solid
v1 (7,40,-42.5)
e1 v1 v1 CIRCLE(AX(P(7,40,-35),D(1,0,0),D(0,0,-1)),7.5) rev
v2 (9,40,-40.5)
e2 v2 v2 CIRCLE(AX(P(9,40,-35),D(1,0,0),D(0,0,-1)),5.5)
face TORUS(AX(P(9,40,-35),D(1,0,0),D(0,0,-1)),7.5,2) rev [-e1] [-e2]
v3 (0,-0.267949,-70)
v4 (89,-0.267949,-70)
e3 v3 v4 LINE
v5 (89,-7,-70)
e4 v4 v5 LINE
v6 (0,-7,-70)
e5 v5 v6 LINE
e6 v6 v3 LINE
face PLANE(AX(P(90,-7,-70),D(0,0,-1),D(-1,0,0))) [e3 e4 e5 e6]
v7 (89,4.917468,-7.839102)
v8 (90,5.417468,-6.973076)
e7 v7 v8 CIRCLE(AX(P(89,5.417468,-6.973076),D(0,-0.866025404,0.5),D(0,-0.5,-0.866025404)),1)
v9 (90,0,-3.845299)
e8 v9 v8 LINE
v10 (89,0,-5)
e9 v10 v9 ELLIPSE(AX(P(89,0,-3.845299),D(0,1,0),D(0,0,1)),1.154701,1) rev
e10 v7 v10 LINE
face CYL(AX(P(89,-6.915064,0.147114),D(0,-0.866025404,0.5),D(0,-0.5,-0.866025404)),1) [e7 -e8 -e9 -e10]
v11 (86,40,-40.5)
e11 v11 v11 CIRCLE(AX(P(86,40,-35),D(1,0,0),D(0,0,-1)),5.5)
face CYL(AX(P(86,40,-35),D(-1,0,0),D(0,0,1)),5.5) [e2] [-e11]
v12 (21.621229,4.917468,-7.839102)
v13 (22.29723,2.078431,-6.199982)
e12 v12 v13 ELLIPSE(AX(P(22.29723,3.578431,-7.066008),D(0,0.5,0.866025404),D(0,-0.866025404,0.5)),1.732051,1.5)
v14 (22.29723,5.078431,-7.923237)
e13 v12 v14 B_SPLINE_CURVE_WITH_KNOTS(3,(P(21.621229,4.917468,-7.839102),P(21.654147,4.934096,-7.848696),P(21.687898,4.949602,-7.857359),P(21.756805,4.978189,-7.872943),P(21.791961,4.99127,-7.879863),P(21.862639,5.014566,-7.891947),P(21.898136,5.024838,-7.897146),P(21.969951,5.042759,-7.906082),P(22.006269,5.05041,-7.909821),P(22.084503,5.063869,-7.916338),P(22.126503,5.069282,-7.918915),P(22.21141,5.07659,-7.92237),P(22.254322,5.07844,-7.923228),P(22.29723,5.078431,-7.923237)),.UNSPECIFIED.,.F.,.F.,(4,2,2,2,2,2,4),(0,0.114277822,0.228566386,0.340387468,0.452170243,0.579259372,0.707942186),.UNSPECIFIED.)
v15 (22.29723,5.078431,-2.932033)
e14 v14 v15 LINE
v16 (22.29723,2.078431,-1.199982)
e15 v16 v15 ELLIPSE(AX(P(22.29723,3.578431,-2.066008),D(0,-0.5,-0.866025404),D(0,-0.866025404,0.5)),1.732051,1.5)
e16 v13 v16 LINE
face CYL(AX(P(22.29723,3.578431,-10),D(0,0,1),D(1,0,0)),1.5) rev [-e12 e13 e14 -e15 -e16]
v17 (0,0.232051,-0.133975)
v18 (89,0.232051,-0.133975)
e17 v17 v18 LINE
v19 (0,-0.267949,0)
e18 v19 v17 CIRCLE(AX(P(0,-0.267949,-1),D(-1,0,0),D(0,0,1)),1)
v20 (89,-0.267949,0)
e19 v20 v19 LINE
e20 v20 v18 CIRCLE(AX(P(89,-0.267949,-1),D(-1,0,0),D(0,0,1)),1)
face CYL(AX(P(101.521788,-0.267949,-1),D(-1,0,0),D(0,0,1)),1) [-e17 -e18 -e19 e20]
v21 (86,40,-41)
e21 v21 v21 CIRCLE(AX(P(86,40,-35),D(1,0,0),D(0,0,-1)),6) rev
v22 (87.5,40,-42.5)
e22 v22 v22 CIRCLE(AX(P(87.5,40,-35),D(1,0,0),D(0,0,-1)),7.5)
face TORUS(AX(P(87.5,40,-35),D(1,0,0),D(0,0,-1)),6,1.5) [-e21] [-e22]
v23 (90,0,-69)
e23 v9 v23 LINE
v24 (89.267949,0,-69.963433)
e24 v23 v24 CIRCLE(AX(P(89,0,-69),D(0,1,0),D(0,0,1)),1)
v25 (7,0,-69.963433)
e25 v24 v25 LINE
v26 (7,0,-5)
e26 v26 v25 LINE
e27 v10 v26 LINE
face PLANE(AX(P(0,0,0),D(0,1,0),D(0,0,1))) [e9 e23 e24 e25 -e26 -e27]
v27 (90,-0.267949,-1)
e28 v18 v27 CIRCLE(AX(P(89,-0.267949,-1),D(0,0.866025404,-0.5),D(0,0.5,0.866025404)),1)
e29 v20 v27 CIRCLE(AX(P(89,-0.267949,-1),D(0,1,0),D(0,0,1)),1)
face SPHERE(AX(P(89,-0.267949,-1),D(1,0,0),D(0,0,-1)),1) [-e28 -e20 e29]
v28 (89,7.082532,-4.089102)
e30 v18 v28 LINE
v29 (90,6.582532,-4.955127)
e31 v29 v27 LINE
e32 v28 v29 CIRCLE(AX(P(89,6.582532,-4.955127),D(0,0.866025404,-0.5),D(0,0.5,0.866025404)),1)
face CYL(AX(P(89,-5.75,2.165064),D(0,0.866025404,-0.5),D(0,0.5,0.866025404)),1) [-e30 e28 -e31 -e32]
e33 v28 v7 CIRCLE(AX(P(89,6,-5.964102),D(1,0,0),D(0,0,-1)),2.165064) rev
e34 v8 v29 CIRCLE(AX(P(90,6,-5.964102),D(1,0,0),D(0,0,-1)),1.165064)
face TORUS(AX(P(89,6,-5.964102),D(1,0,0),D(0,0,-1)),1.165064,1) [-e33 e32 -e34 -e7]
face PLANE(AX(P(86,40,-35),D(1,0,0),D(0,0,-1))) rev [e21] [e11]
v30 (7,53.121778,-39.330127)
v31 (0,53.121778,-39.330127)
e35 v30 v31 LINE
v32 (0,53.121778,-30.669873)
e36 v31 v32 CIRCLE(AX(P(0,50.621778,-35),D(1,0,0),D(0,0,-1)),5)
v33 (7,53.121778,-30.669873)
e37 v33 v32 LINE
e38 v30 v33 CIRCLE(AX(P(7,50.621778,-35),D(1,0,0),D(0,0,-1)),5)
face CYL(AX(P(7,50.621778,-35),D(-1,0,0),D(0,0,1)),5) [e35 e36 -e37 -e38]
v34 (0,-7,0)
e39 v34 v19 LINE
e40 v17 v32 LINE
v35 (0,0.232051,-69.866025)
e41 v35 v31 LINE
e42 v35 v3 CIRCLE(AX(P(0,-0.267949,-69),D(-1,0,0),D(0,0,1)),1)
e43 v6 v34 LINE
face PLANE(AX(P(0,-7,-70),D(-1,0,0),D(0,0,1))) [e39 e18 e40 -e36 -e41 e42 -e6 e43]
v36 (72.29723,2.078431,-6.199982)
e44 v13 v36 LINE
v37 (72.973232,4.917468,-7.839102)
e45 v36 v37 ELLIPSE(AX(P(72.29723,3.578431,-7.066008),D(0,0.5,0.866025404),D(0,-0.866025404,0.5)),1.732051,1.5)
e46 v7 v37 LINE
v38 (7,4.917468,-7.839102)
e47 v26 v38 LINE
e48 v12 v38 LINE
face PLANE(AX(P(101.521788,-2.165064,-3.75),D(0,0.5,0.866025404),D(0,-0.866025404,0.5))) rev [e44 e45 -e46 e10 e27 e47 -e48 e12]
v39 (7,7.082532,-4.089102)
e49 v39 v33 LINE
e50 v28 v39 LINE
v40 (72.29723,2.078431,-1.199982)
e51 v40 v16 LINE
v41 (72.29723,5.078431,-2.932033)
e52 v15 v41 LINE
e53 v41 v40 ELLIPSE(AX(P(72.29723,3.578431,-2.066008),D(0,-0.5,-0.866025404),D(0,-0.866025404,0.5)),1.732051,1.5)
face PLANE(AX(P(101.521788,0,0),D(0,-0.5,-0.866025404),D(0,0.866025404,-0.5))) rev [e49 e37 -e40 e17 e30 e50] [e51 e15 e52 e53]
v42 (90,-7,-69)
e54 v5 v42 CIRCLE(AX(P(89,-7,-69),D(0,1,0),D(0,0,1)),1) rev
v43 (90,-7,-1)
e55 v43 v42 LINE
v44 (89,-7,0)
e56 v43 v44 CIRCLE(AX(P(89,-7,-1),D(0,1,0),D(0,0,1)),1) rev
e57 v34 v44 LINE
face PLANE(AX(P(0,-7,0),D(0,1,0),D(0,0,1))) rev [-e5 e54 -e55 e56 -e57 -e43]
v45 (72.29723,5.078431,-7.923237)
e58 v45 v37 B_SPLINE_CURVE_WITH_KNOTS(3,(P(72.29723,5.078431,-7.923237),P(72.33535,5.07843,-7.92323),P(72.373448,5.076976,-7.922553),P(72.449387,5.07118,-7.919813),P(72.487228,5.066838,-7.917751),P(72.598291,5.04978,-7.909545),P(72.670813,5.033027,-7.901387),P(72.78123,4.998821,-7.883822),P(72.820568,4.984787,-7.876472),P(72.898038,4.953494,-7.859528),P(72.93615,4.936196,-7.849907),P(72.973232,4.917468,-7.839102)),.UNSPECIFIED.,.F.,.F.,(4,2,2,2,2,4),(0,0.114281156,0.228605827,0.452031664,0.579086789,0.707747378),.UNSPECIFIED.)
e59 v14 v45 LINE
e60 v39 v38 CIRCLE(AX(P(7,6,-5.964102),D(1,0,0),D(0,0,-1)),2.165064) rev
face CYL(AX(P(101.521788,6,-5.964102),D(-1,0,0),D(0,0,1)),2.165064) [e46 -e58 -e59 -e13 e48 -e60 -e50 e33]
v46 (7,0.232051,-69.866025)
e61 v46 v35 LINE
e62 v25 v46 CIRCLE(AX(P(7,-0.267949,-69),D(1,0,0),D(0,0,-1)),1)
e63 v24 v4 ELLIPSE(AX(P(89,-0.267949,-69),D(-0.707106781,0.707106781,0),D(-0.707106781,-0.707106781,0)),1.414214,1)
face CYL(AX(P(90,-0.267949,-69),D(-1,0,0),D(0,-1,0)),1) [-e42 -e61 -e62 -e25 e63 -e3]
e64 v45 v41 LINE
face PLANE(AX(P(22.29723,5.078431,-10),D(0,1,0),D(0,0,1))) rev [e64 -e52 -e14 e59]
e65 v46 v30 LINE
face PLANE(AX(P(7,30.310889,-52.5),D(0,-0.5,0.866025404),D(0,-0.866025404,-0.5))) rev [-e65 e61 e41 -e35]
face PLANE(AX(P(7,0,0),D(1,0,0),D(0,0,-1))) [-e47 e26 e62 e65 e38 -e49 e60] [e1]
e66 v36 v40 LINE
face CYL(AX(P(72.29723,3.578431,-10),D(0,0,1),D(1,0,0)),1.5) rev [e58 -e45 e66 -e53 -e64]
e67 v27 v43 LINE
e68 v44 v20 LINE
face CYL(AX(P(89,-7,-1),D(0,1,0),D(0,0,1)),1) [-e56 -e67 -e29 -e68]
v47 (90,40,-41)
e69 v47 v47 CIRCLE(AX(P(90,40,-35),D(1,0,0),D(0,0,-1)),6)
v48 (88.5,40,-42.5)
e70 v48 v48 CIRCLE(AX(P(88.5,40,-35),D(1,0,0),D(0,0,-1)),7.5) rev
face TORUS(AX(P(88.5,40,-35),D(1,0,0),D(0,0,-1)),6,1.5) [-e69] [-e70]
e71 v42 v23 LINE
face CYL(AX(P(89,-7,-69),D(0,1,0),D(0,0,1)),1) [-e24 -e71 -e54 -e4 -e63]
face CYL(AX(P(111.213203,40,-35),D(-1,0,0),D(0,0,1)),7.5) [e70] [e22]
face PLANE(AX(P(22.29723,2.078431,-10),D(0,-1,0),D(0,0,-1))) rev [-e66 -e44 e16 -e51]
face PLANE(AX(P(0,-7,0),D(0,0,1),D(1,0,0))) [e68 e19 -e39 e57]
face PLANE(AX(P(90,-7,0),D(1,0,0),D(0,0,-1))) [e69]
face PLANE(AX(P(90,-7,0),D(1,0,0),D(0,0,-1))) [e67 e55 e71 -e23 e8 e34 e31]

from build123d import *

# Parameters (mm, degrees)
SKETCH_2_W          = 90
SKETCH_2_H          = 70
EXTRUDE_1_DEPTH     = 7
EXTRUDE_4_DEPTH     = 7
SKETCH_9_R          = 5.5
EXTRUDE_5_DEPTH     = 79
EXTRUDE_START       = 79
SKETCH_10_R         = 7.5
EXTRUDE_6_DEPTH     = 4
EXTRUDE_7_DEPTH     = 83
CUT_EXTRUDE_1_DEPTH = 10
FILLET_START        = -1
FILLET_1_DEPTH      = 92
FILLET_2_R          = 1
FILLET_3_R          = 1.5
FILLET_4_R          = 1.5
FILLET_9_R          = 1
FILLET_10_R         = 1
FILLET_12_R         = 2


with BuildPart() as part:
    # 草图2 → 凸台-拉伸1 (new body)
    with BuildSketch(Plane(origin=(0, 0, 0), x_dir=(1, 0, 0), z_dir=(0, 1, 0))):
        with Locations((45, 35)):
            Rectangle(SKETCH_2_W, SKETCH_2_H)
    extrude(amount=-EXTRUDE_1_DEPTH)



with BuildPart() as body_2:
    # 草图4 → 凸台-拉伸4 (new body)
    with BuildSketch(Plane(origin=(0, 0, 0), x_dir=(0, 0, -1), z_dir=(1, 0, 0))):
        with BuildLine():
            Line((0, 0), (30.669872981, 53.121778265))
            ThreePointArc((30.669872981, 53.121778265), (35, 55.621778265), (39.330127019, 53.121778265))
            Line((39.330127019, 53.121778265), (70, 0))
            Line((70, 0), (0, 0))
        make_face()
    extrude(amount=EXTRUDE_4_DEPTH)

    # 草图9 → 凸台-拉伸5 (add)
    with BuildSketch(Plane(origin=(7, 0, 0), x_dir=(0, 0, -1), z_dir=(1, 0, 0))):
        with Locations((35, 40)):
            Circle(SKETCH_9_R)
    extrude(amount=EXTRUDE_5_DEPTH)

    # 草图10 → 凸台-拉伸6 (add)
    with BuildSketch(Plane(origin=(7, 0, 0), x_dir=(0, 0, -1), z_dir=(1, 0, 0)).offset(EXTRUDE_START)):
        with Locations((35, 40)):
            Circle(SKETCH_10_R)
    extrude(amount=EXTRUDE_6_DEPTH)


with BuildPart() as part_1:
    add(part.part)

    add(body_2.part)  # 凸台-拉伸7 merges body 2
    # 草图11 → 凸台-拉伸7 (add)
    with BuildSketch(Plane(origin=(7, 0, 0), x_dir=(0, 0, -1), z_dir=(1, 0, 0))):
        with BuildLine():
            Line((4.089101615, 7.082531755), (0, 0))
            Line((0, 0), (5, 0))
            Line((5, 0), (7.839101615, 4.917468245))
            ThreePointArc((7.839101615, 4.917468245), (7.04663337, 7.875), (4.089101615, 7.082531755))
        make_face()
    extrude(amount=EXTRUDE_7_DEPTH)

    # 草图13 → 切除-拉伸1 (cut)
    with BuildSketch(Plane.XY):
        with BuildLine():
            Line((22.297230248, 5.078430518), (72.297230248, 5.078430518))
            ThreePointArc((72.297230248, 5.078430518), (73.797230248, 3.578430518), (72.297230248, 2.078430518))
            Line((72.297230248, 2.078430518), (22.297230248, 2.078430518))
            ThreePointArc((22.297230248, 2.078430518), (20.797230248, 3.578430518), (22.297230248, 5.078430518))
        make_face()
    extrude(amount=-CUT_EXTRUDE_1_DEPTH, mode=Mode.SUBTRACT)

    # 圆角1: read off the stored shape, not the designer's step
    # 圆角1 outline → 圆角1 (cut)
    with BuildSketch(Plane.YZ.offset(FILLET_START)):
        with BuildLine():
            Line((0, -70), (0.232050808, -69.866025404))
            ThreePointArc((0.232050808, -69.866025404), (-0.009130147, -69.965925826), (-0.267949192, -70))
            Line((-0.267949192, -70), (0, -70))
        make_face()
    extrude(amount=FILLET_1_DEPTH, mode=Mode.SUBTRACT)

    # 圆角2
    fillet_2_edges = [part_1.edges().sort_by_distance(p)[0] for p in [
        (45, 0, 0),
    ]]
    fillet(fillet_2_edges, radius=FILLET_2_R)

    # 圆角3
    fillet_3_edges = [part_1.edges().sort_by_distance(p)[0] for p in [
        (90, 40, -27.5),
    ]]
    fillet(fillet_3_edges, radius=FILLET_3_R)

    # 圆角4
    fillet_4_edges = [part_1.edges().sort_by_distance(p)[0] for p in [
        (86, 40, -27.5),
    ]]
    fillet(fillet_4_edges, radius=FILLET_4_R)

    # 圆角9
    fillet_9_edges = [part_1.edges().sort_by_distance(p)[0] for p in [
        (90, 2.458734123, -6.419550808),
        (90, 3.657291281, -2.111538106),
        (90, 7.875, -7.04663337),
        (90, -3.633974596, 0),
        (90, -0.009130147, -0.034074174),
    ]]
    fillet(fillet_9_edges, radius=FILLET_9_R)

    # 圆角10
    # the kernel refuses this fillet: 1 mm, written as the material it takes off along each edge
    with BuildSketch(Plane(origin=(90, 2.232050808, -70), x_dir=(0, 0, 1), z_dir=(0, -1, 0))) as fillet_10_piece_1:
        with BuildLine():
            CenterArc((FILLET_10_R, FILLET_10_R), FILLET_10_R, 180, 90)
            Line((0, FILLET_10_R), (0, 0))
            Line((0, 0), (FILLET_10_R, 0))
        make_face()
    extrude(amount=11.732050808, mode=Mode.SUBTRACT)

    # 圆角12
    fillet_12_edges = [part_1.edges().sort_by_distance(p)[0] for p in [
        (7, 40, -29.5),
    ]]
    fillet(fillet_12_edges, radius=FILLET_12_R)


solid = part_1.part
